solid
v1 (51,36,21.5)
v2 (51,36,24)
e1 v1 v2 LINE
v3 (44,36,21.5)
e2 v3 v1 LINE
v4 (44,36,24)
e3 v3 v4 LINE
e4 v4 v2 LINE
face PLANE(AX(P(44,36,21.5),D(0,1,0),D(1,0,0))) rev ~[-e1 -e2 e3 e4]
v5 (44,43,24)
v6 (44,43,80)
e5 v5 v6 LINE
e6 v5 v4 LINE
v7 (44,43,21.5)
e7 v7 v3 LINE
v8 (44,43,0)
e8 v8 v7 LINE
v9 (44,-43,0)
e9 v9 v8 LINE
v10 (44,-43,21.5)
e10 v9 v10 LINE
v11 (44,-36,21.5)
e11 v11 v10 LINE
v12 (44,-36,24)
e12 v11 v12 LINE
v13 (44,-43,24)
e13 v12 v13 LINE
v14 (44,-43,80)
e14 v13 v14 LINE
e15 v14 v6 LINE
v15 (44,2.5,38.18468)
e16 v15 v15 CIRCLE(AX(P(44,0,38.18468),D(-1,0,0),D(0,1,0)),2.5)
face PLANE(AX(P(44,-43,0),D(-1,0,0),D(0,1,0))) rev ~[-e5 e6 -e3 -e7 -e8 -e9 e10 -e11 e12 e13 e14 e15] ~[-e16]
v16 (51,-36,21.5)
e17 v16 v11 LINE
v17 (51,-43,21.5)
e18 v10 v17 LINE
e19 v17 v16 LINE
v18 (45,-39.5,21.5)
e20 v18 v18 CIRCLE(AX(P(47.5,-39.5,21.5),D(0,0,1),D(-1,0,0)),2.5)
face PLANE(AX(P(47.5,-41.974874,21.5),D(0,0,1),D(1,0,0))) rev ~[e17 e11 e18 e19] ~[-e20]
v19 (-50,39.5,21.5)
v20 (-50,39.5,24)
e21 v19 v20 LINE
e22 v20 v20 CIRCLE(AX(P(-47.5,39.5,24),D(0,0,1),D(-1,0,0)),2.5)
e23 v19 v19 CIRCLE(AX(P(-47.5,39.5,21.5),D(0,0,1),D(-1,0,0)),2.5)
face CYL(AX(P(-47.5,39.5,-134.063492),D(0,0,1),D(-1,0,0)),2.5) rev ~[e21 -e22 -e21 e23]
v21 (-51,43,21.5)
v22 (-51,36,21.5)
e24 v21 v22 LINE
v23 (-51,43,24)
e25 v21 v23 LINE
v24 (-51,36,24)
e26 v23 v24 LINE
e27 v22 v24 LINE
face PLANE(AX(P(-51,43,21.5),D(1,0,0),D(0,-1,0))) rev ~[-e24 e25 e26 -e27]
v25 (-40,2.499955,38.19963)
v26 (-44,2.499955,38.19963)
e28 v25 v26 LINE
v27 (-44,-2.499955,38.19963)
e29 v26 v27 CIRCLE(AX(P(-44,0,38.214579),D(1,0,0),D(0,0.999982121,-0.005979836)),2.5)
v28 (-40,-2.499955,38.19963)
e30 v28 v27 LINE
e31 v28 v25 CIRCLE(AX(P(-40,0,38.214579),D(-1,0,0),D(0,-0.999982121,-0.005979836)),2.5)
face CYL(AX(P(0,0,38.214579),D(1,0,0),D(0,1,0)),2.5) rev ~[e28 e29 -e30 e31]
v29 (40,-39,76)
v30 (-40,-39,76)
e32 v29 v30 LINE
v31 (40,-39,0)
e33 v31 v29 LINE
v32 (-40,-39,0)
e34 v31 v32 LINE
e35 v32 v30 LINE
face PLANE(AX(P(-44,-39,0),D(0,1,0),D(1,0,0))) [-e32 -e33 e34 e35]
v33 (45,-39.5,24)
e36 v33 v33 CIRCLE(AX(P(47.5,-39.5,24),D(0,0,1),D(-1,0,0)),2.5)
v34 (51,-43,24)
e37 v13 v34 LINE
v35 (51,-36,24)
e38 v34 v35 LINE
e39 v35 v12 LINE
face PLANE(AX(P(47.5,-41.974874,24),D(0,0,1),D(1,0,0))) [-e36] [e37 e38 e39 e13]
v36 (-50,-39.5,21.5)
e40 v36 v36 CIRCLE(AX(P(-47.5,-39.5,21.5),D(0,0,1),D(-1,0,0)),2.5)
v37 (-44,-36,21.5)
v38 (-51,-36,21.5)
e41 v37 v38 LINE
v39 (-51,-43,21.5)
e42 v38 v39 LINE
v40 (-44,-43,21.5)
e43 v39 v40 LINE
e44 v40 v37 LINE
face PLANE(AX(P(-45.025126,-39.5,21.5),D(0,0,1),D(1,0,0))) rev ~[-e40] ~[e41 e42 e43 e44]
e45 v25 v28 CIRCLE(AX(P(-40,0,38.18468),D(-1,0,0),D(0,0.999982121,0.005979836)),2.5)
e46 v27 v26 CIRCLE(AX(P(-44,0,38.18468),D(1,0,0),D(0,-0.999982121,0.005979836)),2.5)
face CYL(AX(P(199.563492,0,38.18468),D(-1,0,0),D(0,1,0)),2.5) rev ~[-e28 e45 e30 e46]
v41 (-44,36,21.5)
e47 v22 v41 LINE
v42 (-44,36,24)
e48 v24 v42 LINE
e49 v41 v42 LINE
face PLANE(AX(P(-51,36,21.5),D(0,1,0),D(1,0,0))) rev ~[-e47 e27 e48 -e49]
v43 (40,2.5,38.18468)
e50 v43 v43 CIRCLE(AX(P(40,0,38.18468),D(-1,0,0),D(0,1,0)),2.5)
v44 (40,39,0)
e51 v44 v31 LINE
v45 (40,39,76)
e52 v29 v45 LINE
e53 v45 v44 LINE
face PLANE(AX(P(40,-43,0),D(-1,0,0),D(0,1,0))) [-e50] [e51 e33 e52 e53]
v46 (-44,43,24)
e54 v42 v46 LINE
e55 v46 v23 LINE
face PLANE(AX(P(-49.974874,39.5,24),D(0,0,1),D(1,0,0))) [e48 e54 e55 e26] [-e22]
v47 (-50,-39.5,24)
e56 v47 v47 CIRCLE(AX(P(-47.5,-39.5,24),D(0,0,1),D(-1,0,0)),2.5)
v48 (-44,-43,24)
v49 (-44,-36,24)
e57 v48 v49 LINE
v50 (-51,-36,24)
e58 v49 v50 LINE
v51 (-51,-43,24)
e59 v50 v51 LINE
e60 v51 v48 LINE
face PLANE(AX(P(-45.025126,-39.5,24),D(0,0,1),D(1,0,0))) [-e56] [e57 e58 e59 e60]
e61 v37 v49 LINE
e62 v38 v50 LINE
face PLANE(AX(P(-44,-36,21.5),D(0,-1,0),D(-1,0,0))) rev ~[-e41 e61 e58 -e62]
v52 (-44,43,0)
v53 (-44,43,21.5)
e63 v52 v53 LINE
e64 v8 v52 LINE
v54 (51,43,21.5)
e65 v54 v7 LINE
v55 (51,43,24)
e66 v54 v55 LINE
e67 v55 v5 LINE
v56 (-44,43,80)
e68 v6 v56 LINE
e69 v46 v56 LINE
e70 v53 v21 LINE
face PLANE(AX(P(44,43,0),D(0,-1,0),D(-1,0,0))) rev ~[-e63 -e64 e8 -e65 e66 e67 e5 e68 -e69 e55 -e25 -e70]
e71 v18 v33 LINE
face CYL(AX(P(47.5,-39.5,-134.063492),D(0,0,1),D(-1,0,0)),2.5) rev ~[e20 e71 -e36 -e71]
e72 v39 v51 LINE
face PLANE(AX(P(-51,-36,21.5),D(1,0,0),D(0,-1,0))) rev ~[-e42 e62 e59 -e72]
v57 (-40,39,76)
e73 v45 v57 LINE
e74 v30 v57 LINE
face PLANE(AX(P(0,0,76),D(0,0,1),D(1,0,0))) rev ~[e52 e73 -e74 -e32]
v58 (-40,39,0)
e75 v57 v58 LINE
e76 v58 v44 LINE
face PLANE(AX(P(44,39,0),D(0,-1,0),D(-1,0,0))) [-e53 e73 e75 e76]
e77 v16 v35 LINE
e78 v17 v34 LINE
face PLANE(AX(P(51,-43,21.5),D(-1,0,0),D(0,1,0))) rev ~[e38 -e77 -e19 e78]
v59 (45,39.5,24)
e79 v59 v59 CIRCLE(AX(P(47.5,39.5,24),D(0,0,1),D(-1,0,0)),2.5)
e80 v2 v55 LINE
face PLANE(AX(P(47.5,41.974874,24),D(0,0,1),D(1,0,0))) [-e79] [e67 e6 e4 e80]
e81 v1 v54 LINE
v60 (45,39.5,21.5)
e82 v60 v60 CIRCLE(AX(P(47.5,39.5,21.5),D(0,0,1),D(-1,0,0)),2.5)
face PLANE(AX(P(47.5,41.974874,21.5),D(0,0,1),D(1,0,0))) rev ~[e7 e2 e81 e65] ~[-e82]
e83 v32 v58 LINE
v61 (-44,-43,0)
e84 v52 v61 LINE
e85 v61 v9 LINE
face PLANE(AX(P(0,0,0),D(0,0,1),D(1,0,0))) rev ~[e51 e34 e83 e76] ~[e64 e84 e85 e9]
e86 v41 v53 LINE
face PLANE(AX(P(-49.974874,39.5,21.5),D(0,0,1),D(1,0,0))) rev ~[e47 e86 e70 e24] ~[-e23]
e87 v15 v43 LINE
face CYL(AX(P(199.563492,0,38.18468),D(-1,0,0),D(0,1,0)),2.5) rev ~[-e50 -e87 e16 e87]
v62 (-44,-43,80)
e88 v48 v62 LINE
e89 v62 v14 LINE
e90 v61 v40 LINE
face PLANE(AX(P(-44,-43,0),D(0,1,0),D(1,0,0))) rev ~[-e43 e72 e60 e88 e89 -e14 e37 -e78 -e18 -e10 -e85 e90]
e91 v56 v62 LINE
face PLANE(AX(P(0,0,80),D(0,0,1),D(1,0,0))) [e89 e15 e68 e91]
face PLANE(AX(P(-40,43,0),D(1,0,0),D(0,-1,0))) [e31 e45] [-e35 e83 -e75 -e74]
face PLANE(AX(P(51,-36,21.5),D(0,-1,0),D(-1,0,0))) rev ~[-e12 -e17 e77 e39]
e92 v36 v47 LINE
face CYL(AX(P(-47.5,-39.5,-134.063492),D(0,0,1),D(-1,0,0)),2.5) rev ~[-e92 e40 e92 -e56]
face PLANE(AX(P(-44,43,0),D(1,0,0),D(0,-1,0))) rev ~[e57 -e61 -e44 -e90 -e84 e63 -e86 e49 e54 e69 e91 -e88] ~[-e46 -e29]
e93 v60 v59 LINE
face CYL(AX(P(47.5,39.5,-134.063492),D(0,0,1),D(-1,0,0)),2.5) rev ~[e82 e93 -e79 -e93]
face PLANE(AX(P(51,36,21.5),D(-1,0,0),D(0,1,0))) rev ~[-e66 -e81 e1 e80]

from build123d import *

# Parameters (mm, degrees)
F1_DEPTH  = 80
F8_DEPTH  = 2.5
F9_T      = -4
F10_D     = 5
F14_D     = 5
F15_D     = 5
F15_DEPTH = 51.001


with BuildPart() as f1:
    # F0 (on Top) → F1 (new body)
    with BuildSketch(Plane.XY):
        Polygon((44, -43), (44, 43), (37, 43), (-37, 43), (-44, 43), (-44, -43), (-37, -43), (37, -43), align=None)
    extrude(amount=F1_DEPTH)

    # F7 (on 3pt) → F8 (join)
    with BuildSketch(Plane.XY.offset(21.5)):
        Polygon((-47.5, 39.5), (-51, 43), (-51, 36), align=None)
        Polygon((-51, 36), (-44, 36), (-47.5, 39.5), align=None)
        Polygon((-44, 36), (-44, 43), (-47.5, 39.5), align=None)
        Polygon((-47.5, 39.5), (-44, 43), (-51, 43), align=None)
        Polygon((51, 43), (44, 43), (47.5, 39.5), align=None)
        Polygon((47.5, 39.5), (44, 36), (51, 36), align=None)
        Polygon((51, 36), (51, 43), (47.5, 39.5), align=None)
        Polygon((47.5, 39.5), (44, 43), (44, 36), align=None)
        Polygon((47.5, -39.5), (44, -43), (51, -43), align=None)
        Polygon((51, -36), (44, -36), (47.5, -39.5), align=None)
        Polygon((51, -43), (51, -36), (47.5, -39.5), align=None)
        Polygon((47.5, -39.5), (44, -36), (44, -43), align=None)
        Polygon((-44, -43), (-44, -36), (-47.5, -39.5), align=None)
        Polygon((-47.5, -39.5), (-44, -36), (-51, -36), align=None)
        Polygon((-51, -43), (-47.5, -39.5), (-51, -36), align=None)
        Polygon((-51, -43), (-44, -43), (-47.5, -39.5), align=None)
    extrude(amount=F8_DEPTH)

    # F9
    f9_openings = [f1.faces().sort_by_distance(p)[0] for p in [
        (0, 0, 0),
    ]]
    offset(amount=F9_T, openings=f9_openings, kind=Kind.INTERSECTION)

    # F10 (through all)
    with Locations(Plane(origin=(0, 0, 21.5), x_dir=(1, 0, 0), z_dir=(0, 0, -1))):
        with Locations((47.5, 39.5), (47.5, -39.5), (-47.5, -39.5), (-47.5, 39.5)):
            Hole(F10_D / 2)

    # F14 (through all)
    with Locations(Plane(origin=(44, 0, 0), x_dir=(0, -1, 0), z_dir=(1, 0, 0))):
        with Locations((0, -38.1846800447)):
            Hole(F14_D / 2)

    # F15 (through all, one way)
    with BuildSketch(Plane.YZ):
        with Locations((0, 38.2145792246)):
            Circle(F15_D / 2)
    extrude(amount=-F15_DEPTH, mode=Mode.SUBTRACT)


solid = f1.part
